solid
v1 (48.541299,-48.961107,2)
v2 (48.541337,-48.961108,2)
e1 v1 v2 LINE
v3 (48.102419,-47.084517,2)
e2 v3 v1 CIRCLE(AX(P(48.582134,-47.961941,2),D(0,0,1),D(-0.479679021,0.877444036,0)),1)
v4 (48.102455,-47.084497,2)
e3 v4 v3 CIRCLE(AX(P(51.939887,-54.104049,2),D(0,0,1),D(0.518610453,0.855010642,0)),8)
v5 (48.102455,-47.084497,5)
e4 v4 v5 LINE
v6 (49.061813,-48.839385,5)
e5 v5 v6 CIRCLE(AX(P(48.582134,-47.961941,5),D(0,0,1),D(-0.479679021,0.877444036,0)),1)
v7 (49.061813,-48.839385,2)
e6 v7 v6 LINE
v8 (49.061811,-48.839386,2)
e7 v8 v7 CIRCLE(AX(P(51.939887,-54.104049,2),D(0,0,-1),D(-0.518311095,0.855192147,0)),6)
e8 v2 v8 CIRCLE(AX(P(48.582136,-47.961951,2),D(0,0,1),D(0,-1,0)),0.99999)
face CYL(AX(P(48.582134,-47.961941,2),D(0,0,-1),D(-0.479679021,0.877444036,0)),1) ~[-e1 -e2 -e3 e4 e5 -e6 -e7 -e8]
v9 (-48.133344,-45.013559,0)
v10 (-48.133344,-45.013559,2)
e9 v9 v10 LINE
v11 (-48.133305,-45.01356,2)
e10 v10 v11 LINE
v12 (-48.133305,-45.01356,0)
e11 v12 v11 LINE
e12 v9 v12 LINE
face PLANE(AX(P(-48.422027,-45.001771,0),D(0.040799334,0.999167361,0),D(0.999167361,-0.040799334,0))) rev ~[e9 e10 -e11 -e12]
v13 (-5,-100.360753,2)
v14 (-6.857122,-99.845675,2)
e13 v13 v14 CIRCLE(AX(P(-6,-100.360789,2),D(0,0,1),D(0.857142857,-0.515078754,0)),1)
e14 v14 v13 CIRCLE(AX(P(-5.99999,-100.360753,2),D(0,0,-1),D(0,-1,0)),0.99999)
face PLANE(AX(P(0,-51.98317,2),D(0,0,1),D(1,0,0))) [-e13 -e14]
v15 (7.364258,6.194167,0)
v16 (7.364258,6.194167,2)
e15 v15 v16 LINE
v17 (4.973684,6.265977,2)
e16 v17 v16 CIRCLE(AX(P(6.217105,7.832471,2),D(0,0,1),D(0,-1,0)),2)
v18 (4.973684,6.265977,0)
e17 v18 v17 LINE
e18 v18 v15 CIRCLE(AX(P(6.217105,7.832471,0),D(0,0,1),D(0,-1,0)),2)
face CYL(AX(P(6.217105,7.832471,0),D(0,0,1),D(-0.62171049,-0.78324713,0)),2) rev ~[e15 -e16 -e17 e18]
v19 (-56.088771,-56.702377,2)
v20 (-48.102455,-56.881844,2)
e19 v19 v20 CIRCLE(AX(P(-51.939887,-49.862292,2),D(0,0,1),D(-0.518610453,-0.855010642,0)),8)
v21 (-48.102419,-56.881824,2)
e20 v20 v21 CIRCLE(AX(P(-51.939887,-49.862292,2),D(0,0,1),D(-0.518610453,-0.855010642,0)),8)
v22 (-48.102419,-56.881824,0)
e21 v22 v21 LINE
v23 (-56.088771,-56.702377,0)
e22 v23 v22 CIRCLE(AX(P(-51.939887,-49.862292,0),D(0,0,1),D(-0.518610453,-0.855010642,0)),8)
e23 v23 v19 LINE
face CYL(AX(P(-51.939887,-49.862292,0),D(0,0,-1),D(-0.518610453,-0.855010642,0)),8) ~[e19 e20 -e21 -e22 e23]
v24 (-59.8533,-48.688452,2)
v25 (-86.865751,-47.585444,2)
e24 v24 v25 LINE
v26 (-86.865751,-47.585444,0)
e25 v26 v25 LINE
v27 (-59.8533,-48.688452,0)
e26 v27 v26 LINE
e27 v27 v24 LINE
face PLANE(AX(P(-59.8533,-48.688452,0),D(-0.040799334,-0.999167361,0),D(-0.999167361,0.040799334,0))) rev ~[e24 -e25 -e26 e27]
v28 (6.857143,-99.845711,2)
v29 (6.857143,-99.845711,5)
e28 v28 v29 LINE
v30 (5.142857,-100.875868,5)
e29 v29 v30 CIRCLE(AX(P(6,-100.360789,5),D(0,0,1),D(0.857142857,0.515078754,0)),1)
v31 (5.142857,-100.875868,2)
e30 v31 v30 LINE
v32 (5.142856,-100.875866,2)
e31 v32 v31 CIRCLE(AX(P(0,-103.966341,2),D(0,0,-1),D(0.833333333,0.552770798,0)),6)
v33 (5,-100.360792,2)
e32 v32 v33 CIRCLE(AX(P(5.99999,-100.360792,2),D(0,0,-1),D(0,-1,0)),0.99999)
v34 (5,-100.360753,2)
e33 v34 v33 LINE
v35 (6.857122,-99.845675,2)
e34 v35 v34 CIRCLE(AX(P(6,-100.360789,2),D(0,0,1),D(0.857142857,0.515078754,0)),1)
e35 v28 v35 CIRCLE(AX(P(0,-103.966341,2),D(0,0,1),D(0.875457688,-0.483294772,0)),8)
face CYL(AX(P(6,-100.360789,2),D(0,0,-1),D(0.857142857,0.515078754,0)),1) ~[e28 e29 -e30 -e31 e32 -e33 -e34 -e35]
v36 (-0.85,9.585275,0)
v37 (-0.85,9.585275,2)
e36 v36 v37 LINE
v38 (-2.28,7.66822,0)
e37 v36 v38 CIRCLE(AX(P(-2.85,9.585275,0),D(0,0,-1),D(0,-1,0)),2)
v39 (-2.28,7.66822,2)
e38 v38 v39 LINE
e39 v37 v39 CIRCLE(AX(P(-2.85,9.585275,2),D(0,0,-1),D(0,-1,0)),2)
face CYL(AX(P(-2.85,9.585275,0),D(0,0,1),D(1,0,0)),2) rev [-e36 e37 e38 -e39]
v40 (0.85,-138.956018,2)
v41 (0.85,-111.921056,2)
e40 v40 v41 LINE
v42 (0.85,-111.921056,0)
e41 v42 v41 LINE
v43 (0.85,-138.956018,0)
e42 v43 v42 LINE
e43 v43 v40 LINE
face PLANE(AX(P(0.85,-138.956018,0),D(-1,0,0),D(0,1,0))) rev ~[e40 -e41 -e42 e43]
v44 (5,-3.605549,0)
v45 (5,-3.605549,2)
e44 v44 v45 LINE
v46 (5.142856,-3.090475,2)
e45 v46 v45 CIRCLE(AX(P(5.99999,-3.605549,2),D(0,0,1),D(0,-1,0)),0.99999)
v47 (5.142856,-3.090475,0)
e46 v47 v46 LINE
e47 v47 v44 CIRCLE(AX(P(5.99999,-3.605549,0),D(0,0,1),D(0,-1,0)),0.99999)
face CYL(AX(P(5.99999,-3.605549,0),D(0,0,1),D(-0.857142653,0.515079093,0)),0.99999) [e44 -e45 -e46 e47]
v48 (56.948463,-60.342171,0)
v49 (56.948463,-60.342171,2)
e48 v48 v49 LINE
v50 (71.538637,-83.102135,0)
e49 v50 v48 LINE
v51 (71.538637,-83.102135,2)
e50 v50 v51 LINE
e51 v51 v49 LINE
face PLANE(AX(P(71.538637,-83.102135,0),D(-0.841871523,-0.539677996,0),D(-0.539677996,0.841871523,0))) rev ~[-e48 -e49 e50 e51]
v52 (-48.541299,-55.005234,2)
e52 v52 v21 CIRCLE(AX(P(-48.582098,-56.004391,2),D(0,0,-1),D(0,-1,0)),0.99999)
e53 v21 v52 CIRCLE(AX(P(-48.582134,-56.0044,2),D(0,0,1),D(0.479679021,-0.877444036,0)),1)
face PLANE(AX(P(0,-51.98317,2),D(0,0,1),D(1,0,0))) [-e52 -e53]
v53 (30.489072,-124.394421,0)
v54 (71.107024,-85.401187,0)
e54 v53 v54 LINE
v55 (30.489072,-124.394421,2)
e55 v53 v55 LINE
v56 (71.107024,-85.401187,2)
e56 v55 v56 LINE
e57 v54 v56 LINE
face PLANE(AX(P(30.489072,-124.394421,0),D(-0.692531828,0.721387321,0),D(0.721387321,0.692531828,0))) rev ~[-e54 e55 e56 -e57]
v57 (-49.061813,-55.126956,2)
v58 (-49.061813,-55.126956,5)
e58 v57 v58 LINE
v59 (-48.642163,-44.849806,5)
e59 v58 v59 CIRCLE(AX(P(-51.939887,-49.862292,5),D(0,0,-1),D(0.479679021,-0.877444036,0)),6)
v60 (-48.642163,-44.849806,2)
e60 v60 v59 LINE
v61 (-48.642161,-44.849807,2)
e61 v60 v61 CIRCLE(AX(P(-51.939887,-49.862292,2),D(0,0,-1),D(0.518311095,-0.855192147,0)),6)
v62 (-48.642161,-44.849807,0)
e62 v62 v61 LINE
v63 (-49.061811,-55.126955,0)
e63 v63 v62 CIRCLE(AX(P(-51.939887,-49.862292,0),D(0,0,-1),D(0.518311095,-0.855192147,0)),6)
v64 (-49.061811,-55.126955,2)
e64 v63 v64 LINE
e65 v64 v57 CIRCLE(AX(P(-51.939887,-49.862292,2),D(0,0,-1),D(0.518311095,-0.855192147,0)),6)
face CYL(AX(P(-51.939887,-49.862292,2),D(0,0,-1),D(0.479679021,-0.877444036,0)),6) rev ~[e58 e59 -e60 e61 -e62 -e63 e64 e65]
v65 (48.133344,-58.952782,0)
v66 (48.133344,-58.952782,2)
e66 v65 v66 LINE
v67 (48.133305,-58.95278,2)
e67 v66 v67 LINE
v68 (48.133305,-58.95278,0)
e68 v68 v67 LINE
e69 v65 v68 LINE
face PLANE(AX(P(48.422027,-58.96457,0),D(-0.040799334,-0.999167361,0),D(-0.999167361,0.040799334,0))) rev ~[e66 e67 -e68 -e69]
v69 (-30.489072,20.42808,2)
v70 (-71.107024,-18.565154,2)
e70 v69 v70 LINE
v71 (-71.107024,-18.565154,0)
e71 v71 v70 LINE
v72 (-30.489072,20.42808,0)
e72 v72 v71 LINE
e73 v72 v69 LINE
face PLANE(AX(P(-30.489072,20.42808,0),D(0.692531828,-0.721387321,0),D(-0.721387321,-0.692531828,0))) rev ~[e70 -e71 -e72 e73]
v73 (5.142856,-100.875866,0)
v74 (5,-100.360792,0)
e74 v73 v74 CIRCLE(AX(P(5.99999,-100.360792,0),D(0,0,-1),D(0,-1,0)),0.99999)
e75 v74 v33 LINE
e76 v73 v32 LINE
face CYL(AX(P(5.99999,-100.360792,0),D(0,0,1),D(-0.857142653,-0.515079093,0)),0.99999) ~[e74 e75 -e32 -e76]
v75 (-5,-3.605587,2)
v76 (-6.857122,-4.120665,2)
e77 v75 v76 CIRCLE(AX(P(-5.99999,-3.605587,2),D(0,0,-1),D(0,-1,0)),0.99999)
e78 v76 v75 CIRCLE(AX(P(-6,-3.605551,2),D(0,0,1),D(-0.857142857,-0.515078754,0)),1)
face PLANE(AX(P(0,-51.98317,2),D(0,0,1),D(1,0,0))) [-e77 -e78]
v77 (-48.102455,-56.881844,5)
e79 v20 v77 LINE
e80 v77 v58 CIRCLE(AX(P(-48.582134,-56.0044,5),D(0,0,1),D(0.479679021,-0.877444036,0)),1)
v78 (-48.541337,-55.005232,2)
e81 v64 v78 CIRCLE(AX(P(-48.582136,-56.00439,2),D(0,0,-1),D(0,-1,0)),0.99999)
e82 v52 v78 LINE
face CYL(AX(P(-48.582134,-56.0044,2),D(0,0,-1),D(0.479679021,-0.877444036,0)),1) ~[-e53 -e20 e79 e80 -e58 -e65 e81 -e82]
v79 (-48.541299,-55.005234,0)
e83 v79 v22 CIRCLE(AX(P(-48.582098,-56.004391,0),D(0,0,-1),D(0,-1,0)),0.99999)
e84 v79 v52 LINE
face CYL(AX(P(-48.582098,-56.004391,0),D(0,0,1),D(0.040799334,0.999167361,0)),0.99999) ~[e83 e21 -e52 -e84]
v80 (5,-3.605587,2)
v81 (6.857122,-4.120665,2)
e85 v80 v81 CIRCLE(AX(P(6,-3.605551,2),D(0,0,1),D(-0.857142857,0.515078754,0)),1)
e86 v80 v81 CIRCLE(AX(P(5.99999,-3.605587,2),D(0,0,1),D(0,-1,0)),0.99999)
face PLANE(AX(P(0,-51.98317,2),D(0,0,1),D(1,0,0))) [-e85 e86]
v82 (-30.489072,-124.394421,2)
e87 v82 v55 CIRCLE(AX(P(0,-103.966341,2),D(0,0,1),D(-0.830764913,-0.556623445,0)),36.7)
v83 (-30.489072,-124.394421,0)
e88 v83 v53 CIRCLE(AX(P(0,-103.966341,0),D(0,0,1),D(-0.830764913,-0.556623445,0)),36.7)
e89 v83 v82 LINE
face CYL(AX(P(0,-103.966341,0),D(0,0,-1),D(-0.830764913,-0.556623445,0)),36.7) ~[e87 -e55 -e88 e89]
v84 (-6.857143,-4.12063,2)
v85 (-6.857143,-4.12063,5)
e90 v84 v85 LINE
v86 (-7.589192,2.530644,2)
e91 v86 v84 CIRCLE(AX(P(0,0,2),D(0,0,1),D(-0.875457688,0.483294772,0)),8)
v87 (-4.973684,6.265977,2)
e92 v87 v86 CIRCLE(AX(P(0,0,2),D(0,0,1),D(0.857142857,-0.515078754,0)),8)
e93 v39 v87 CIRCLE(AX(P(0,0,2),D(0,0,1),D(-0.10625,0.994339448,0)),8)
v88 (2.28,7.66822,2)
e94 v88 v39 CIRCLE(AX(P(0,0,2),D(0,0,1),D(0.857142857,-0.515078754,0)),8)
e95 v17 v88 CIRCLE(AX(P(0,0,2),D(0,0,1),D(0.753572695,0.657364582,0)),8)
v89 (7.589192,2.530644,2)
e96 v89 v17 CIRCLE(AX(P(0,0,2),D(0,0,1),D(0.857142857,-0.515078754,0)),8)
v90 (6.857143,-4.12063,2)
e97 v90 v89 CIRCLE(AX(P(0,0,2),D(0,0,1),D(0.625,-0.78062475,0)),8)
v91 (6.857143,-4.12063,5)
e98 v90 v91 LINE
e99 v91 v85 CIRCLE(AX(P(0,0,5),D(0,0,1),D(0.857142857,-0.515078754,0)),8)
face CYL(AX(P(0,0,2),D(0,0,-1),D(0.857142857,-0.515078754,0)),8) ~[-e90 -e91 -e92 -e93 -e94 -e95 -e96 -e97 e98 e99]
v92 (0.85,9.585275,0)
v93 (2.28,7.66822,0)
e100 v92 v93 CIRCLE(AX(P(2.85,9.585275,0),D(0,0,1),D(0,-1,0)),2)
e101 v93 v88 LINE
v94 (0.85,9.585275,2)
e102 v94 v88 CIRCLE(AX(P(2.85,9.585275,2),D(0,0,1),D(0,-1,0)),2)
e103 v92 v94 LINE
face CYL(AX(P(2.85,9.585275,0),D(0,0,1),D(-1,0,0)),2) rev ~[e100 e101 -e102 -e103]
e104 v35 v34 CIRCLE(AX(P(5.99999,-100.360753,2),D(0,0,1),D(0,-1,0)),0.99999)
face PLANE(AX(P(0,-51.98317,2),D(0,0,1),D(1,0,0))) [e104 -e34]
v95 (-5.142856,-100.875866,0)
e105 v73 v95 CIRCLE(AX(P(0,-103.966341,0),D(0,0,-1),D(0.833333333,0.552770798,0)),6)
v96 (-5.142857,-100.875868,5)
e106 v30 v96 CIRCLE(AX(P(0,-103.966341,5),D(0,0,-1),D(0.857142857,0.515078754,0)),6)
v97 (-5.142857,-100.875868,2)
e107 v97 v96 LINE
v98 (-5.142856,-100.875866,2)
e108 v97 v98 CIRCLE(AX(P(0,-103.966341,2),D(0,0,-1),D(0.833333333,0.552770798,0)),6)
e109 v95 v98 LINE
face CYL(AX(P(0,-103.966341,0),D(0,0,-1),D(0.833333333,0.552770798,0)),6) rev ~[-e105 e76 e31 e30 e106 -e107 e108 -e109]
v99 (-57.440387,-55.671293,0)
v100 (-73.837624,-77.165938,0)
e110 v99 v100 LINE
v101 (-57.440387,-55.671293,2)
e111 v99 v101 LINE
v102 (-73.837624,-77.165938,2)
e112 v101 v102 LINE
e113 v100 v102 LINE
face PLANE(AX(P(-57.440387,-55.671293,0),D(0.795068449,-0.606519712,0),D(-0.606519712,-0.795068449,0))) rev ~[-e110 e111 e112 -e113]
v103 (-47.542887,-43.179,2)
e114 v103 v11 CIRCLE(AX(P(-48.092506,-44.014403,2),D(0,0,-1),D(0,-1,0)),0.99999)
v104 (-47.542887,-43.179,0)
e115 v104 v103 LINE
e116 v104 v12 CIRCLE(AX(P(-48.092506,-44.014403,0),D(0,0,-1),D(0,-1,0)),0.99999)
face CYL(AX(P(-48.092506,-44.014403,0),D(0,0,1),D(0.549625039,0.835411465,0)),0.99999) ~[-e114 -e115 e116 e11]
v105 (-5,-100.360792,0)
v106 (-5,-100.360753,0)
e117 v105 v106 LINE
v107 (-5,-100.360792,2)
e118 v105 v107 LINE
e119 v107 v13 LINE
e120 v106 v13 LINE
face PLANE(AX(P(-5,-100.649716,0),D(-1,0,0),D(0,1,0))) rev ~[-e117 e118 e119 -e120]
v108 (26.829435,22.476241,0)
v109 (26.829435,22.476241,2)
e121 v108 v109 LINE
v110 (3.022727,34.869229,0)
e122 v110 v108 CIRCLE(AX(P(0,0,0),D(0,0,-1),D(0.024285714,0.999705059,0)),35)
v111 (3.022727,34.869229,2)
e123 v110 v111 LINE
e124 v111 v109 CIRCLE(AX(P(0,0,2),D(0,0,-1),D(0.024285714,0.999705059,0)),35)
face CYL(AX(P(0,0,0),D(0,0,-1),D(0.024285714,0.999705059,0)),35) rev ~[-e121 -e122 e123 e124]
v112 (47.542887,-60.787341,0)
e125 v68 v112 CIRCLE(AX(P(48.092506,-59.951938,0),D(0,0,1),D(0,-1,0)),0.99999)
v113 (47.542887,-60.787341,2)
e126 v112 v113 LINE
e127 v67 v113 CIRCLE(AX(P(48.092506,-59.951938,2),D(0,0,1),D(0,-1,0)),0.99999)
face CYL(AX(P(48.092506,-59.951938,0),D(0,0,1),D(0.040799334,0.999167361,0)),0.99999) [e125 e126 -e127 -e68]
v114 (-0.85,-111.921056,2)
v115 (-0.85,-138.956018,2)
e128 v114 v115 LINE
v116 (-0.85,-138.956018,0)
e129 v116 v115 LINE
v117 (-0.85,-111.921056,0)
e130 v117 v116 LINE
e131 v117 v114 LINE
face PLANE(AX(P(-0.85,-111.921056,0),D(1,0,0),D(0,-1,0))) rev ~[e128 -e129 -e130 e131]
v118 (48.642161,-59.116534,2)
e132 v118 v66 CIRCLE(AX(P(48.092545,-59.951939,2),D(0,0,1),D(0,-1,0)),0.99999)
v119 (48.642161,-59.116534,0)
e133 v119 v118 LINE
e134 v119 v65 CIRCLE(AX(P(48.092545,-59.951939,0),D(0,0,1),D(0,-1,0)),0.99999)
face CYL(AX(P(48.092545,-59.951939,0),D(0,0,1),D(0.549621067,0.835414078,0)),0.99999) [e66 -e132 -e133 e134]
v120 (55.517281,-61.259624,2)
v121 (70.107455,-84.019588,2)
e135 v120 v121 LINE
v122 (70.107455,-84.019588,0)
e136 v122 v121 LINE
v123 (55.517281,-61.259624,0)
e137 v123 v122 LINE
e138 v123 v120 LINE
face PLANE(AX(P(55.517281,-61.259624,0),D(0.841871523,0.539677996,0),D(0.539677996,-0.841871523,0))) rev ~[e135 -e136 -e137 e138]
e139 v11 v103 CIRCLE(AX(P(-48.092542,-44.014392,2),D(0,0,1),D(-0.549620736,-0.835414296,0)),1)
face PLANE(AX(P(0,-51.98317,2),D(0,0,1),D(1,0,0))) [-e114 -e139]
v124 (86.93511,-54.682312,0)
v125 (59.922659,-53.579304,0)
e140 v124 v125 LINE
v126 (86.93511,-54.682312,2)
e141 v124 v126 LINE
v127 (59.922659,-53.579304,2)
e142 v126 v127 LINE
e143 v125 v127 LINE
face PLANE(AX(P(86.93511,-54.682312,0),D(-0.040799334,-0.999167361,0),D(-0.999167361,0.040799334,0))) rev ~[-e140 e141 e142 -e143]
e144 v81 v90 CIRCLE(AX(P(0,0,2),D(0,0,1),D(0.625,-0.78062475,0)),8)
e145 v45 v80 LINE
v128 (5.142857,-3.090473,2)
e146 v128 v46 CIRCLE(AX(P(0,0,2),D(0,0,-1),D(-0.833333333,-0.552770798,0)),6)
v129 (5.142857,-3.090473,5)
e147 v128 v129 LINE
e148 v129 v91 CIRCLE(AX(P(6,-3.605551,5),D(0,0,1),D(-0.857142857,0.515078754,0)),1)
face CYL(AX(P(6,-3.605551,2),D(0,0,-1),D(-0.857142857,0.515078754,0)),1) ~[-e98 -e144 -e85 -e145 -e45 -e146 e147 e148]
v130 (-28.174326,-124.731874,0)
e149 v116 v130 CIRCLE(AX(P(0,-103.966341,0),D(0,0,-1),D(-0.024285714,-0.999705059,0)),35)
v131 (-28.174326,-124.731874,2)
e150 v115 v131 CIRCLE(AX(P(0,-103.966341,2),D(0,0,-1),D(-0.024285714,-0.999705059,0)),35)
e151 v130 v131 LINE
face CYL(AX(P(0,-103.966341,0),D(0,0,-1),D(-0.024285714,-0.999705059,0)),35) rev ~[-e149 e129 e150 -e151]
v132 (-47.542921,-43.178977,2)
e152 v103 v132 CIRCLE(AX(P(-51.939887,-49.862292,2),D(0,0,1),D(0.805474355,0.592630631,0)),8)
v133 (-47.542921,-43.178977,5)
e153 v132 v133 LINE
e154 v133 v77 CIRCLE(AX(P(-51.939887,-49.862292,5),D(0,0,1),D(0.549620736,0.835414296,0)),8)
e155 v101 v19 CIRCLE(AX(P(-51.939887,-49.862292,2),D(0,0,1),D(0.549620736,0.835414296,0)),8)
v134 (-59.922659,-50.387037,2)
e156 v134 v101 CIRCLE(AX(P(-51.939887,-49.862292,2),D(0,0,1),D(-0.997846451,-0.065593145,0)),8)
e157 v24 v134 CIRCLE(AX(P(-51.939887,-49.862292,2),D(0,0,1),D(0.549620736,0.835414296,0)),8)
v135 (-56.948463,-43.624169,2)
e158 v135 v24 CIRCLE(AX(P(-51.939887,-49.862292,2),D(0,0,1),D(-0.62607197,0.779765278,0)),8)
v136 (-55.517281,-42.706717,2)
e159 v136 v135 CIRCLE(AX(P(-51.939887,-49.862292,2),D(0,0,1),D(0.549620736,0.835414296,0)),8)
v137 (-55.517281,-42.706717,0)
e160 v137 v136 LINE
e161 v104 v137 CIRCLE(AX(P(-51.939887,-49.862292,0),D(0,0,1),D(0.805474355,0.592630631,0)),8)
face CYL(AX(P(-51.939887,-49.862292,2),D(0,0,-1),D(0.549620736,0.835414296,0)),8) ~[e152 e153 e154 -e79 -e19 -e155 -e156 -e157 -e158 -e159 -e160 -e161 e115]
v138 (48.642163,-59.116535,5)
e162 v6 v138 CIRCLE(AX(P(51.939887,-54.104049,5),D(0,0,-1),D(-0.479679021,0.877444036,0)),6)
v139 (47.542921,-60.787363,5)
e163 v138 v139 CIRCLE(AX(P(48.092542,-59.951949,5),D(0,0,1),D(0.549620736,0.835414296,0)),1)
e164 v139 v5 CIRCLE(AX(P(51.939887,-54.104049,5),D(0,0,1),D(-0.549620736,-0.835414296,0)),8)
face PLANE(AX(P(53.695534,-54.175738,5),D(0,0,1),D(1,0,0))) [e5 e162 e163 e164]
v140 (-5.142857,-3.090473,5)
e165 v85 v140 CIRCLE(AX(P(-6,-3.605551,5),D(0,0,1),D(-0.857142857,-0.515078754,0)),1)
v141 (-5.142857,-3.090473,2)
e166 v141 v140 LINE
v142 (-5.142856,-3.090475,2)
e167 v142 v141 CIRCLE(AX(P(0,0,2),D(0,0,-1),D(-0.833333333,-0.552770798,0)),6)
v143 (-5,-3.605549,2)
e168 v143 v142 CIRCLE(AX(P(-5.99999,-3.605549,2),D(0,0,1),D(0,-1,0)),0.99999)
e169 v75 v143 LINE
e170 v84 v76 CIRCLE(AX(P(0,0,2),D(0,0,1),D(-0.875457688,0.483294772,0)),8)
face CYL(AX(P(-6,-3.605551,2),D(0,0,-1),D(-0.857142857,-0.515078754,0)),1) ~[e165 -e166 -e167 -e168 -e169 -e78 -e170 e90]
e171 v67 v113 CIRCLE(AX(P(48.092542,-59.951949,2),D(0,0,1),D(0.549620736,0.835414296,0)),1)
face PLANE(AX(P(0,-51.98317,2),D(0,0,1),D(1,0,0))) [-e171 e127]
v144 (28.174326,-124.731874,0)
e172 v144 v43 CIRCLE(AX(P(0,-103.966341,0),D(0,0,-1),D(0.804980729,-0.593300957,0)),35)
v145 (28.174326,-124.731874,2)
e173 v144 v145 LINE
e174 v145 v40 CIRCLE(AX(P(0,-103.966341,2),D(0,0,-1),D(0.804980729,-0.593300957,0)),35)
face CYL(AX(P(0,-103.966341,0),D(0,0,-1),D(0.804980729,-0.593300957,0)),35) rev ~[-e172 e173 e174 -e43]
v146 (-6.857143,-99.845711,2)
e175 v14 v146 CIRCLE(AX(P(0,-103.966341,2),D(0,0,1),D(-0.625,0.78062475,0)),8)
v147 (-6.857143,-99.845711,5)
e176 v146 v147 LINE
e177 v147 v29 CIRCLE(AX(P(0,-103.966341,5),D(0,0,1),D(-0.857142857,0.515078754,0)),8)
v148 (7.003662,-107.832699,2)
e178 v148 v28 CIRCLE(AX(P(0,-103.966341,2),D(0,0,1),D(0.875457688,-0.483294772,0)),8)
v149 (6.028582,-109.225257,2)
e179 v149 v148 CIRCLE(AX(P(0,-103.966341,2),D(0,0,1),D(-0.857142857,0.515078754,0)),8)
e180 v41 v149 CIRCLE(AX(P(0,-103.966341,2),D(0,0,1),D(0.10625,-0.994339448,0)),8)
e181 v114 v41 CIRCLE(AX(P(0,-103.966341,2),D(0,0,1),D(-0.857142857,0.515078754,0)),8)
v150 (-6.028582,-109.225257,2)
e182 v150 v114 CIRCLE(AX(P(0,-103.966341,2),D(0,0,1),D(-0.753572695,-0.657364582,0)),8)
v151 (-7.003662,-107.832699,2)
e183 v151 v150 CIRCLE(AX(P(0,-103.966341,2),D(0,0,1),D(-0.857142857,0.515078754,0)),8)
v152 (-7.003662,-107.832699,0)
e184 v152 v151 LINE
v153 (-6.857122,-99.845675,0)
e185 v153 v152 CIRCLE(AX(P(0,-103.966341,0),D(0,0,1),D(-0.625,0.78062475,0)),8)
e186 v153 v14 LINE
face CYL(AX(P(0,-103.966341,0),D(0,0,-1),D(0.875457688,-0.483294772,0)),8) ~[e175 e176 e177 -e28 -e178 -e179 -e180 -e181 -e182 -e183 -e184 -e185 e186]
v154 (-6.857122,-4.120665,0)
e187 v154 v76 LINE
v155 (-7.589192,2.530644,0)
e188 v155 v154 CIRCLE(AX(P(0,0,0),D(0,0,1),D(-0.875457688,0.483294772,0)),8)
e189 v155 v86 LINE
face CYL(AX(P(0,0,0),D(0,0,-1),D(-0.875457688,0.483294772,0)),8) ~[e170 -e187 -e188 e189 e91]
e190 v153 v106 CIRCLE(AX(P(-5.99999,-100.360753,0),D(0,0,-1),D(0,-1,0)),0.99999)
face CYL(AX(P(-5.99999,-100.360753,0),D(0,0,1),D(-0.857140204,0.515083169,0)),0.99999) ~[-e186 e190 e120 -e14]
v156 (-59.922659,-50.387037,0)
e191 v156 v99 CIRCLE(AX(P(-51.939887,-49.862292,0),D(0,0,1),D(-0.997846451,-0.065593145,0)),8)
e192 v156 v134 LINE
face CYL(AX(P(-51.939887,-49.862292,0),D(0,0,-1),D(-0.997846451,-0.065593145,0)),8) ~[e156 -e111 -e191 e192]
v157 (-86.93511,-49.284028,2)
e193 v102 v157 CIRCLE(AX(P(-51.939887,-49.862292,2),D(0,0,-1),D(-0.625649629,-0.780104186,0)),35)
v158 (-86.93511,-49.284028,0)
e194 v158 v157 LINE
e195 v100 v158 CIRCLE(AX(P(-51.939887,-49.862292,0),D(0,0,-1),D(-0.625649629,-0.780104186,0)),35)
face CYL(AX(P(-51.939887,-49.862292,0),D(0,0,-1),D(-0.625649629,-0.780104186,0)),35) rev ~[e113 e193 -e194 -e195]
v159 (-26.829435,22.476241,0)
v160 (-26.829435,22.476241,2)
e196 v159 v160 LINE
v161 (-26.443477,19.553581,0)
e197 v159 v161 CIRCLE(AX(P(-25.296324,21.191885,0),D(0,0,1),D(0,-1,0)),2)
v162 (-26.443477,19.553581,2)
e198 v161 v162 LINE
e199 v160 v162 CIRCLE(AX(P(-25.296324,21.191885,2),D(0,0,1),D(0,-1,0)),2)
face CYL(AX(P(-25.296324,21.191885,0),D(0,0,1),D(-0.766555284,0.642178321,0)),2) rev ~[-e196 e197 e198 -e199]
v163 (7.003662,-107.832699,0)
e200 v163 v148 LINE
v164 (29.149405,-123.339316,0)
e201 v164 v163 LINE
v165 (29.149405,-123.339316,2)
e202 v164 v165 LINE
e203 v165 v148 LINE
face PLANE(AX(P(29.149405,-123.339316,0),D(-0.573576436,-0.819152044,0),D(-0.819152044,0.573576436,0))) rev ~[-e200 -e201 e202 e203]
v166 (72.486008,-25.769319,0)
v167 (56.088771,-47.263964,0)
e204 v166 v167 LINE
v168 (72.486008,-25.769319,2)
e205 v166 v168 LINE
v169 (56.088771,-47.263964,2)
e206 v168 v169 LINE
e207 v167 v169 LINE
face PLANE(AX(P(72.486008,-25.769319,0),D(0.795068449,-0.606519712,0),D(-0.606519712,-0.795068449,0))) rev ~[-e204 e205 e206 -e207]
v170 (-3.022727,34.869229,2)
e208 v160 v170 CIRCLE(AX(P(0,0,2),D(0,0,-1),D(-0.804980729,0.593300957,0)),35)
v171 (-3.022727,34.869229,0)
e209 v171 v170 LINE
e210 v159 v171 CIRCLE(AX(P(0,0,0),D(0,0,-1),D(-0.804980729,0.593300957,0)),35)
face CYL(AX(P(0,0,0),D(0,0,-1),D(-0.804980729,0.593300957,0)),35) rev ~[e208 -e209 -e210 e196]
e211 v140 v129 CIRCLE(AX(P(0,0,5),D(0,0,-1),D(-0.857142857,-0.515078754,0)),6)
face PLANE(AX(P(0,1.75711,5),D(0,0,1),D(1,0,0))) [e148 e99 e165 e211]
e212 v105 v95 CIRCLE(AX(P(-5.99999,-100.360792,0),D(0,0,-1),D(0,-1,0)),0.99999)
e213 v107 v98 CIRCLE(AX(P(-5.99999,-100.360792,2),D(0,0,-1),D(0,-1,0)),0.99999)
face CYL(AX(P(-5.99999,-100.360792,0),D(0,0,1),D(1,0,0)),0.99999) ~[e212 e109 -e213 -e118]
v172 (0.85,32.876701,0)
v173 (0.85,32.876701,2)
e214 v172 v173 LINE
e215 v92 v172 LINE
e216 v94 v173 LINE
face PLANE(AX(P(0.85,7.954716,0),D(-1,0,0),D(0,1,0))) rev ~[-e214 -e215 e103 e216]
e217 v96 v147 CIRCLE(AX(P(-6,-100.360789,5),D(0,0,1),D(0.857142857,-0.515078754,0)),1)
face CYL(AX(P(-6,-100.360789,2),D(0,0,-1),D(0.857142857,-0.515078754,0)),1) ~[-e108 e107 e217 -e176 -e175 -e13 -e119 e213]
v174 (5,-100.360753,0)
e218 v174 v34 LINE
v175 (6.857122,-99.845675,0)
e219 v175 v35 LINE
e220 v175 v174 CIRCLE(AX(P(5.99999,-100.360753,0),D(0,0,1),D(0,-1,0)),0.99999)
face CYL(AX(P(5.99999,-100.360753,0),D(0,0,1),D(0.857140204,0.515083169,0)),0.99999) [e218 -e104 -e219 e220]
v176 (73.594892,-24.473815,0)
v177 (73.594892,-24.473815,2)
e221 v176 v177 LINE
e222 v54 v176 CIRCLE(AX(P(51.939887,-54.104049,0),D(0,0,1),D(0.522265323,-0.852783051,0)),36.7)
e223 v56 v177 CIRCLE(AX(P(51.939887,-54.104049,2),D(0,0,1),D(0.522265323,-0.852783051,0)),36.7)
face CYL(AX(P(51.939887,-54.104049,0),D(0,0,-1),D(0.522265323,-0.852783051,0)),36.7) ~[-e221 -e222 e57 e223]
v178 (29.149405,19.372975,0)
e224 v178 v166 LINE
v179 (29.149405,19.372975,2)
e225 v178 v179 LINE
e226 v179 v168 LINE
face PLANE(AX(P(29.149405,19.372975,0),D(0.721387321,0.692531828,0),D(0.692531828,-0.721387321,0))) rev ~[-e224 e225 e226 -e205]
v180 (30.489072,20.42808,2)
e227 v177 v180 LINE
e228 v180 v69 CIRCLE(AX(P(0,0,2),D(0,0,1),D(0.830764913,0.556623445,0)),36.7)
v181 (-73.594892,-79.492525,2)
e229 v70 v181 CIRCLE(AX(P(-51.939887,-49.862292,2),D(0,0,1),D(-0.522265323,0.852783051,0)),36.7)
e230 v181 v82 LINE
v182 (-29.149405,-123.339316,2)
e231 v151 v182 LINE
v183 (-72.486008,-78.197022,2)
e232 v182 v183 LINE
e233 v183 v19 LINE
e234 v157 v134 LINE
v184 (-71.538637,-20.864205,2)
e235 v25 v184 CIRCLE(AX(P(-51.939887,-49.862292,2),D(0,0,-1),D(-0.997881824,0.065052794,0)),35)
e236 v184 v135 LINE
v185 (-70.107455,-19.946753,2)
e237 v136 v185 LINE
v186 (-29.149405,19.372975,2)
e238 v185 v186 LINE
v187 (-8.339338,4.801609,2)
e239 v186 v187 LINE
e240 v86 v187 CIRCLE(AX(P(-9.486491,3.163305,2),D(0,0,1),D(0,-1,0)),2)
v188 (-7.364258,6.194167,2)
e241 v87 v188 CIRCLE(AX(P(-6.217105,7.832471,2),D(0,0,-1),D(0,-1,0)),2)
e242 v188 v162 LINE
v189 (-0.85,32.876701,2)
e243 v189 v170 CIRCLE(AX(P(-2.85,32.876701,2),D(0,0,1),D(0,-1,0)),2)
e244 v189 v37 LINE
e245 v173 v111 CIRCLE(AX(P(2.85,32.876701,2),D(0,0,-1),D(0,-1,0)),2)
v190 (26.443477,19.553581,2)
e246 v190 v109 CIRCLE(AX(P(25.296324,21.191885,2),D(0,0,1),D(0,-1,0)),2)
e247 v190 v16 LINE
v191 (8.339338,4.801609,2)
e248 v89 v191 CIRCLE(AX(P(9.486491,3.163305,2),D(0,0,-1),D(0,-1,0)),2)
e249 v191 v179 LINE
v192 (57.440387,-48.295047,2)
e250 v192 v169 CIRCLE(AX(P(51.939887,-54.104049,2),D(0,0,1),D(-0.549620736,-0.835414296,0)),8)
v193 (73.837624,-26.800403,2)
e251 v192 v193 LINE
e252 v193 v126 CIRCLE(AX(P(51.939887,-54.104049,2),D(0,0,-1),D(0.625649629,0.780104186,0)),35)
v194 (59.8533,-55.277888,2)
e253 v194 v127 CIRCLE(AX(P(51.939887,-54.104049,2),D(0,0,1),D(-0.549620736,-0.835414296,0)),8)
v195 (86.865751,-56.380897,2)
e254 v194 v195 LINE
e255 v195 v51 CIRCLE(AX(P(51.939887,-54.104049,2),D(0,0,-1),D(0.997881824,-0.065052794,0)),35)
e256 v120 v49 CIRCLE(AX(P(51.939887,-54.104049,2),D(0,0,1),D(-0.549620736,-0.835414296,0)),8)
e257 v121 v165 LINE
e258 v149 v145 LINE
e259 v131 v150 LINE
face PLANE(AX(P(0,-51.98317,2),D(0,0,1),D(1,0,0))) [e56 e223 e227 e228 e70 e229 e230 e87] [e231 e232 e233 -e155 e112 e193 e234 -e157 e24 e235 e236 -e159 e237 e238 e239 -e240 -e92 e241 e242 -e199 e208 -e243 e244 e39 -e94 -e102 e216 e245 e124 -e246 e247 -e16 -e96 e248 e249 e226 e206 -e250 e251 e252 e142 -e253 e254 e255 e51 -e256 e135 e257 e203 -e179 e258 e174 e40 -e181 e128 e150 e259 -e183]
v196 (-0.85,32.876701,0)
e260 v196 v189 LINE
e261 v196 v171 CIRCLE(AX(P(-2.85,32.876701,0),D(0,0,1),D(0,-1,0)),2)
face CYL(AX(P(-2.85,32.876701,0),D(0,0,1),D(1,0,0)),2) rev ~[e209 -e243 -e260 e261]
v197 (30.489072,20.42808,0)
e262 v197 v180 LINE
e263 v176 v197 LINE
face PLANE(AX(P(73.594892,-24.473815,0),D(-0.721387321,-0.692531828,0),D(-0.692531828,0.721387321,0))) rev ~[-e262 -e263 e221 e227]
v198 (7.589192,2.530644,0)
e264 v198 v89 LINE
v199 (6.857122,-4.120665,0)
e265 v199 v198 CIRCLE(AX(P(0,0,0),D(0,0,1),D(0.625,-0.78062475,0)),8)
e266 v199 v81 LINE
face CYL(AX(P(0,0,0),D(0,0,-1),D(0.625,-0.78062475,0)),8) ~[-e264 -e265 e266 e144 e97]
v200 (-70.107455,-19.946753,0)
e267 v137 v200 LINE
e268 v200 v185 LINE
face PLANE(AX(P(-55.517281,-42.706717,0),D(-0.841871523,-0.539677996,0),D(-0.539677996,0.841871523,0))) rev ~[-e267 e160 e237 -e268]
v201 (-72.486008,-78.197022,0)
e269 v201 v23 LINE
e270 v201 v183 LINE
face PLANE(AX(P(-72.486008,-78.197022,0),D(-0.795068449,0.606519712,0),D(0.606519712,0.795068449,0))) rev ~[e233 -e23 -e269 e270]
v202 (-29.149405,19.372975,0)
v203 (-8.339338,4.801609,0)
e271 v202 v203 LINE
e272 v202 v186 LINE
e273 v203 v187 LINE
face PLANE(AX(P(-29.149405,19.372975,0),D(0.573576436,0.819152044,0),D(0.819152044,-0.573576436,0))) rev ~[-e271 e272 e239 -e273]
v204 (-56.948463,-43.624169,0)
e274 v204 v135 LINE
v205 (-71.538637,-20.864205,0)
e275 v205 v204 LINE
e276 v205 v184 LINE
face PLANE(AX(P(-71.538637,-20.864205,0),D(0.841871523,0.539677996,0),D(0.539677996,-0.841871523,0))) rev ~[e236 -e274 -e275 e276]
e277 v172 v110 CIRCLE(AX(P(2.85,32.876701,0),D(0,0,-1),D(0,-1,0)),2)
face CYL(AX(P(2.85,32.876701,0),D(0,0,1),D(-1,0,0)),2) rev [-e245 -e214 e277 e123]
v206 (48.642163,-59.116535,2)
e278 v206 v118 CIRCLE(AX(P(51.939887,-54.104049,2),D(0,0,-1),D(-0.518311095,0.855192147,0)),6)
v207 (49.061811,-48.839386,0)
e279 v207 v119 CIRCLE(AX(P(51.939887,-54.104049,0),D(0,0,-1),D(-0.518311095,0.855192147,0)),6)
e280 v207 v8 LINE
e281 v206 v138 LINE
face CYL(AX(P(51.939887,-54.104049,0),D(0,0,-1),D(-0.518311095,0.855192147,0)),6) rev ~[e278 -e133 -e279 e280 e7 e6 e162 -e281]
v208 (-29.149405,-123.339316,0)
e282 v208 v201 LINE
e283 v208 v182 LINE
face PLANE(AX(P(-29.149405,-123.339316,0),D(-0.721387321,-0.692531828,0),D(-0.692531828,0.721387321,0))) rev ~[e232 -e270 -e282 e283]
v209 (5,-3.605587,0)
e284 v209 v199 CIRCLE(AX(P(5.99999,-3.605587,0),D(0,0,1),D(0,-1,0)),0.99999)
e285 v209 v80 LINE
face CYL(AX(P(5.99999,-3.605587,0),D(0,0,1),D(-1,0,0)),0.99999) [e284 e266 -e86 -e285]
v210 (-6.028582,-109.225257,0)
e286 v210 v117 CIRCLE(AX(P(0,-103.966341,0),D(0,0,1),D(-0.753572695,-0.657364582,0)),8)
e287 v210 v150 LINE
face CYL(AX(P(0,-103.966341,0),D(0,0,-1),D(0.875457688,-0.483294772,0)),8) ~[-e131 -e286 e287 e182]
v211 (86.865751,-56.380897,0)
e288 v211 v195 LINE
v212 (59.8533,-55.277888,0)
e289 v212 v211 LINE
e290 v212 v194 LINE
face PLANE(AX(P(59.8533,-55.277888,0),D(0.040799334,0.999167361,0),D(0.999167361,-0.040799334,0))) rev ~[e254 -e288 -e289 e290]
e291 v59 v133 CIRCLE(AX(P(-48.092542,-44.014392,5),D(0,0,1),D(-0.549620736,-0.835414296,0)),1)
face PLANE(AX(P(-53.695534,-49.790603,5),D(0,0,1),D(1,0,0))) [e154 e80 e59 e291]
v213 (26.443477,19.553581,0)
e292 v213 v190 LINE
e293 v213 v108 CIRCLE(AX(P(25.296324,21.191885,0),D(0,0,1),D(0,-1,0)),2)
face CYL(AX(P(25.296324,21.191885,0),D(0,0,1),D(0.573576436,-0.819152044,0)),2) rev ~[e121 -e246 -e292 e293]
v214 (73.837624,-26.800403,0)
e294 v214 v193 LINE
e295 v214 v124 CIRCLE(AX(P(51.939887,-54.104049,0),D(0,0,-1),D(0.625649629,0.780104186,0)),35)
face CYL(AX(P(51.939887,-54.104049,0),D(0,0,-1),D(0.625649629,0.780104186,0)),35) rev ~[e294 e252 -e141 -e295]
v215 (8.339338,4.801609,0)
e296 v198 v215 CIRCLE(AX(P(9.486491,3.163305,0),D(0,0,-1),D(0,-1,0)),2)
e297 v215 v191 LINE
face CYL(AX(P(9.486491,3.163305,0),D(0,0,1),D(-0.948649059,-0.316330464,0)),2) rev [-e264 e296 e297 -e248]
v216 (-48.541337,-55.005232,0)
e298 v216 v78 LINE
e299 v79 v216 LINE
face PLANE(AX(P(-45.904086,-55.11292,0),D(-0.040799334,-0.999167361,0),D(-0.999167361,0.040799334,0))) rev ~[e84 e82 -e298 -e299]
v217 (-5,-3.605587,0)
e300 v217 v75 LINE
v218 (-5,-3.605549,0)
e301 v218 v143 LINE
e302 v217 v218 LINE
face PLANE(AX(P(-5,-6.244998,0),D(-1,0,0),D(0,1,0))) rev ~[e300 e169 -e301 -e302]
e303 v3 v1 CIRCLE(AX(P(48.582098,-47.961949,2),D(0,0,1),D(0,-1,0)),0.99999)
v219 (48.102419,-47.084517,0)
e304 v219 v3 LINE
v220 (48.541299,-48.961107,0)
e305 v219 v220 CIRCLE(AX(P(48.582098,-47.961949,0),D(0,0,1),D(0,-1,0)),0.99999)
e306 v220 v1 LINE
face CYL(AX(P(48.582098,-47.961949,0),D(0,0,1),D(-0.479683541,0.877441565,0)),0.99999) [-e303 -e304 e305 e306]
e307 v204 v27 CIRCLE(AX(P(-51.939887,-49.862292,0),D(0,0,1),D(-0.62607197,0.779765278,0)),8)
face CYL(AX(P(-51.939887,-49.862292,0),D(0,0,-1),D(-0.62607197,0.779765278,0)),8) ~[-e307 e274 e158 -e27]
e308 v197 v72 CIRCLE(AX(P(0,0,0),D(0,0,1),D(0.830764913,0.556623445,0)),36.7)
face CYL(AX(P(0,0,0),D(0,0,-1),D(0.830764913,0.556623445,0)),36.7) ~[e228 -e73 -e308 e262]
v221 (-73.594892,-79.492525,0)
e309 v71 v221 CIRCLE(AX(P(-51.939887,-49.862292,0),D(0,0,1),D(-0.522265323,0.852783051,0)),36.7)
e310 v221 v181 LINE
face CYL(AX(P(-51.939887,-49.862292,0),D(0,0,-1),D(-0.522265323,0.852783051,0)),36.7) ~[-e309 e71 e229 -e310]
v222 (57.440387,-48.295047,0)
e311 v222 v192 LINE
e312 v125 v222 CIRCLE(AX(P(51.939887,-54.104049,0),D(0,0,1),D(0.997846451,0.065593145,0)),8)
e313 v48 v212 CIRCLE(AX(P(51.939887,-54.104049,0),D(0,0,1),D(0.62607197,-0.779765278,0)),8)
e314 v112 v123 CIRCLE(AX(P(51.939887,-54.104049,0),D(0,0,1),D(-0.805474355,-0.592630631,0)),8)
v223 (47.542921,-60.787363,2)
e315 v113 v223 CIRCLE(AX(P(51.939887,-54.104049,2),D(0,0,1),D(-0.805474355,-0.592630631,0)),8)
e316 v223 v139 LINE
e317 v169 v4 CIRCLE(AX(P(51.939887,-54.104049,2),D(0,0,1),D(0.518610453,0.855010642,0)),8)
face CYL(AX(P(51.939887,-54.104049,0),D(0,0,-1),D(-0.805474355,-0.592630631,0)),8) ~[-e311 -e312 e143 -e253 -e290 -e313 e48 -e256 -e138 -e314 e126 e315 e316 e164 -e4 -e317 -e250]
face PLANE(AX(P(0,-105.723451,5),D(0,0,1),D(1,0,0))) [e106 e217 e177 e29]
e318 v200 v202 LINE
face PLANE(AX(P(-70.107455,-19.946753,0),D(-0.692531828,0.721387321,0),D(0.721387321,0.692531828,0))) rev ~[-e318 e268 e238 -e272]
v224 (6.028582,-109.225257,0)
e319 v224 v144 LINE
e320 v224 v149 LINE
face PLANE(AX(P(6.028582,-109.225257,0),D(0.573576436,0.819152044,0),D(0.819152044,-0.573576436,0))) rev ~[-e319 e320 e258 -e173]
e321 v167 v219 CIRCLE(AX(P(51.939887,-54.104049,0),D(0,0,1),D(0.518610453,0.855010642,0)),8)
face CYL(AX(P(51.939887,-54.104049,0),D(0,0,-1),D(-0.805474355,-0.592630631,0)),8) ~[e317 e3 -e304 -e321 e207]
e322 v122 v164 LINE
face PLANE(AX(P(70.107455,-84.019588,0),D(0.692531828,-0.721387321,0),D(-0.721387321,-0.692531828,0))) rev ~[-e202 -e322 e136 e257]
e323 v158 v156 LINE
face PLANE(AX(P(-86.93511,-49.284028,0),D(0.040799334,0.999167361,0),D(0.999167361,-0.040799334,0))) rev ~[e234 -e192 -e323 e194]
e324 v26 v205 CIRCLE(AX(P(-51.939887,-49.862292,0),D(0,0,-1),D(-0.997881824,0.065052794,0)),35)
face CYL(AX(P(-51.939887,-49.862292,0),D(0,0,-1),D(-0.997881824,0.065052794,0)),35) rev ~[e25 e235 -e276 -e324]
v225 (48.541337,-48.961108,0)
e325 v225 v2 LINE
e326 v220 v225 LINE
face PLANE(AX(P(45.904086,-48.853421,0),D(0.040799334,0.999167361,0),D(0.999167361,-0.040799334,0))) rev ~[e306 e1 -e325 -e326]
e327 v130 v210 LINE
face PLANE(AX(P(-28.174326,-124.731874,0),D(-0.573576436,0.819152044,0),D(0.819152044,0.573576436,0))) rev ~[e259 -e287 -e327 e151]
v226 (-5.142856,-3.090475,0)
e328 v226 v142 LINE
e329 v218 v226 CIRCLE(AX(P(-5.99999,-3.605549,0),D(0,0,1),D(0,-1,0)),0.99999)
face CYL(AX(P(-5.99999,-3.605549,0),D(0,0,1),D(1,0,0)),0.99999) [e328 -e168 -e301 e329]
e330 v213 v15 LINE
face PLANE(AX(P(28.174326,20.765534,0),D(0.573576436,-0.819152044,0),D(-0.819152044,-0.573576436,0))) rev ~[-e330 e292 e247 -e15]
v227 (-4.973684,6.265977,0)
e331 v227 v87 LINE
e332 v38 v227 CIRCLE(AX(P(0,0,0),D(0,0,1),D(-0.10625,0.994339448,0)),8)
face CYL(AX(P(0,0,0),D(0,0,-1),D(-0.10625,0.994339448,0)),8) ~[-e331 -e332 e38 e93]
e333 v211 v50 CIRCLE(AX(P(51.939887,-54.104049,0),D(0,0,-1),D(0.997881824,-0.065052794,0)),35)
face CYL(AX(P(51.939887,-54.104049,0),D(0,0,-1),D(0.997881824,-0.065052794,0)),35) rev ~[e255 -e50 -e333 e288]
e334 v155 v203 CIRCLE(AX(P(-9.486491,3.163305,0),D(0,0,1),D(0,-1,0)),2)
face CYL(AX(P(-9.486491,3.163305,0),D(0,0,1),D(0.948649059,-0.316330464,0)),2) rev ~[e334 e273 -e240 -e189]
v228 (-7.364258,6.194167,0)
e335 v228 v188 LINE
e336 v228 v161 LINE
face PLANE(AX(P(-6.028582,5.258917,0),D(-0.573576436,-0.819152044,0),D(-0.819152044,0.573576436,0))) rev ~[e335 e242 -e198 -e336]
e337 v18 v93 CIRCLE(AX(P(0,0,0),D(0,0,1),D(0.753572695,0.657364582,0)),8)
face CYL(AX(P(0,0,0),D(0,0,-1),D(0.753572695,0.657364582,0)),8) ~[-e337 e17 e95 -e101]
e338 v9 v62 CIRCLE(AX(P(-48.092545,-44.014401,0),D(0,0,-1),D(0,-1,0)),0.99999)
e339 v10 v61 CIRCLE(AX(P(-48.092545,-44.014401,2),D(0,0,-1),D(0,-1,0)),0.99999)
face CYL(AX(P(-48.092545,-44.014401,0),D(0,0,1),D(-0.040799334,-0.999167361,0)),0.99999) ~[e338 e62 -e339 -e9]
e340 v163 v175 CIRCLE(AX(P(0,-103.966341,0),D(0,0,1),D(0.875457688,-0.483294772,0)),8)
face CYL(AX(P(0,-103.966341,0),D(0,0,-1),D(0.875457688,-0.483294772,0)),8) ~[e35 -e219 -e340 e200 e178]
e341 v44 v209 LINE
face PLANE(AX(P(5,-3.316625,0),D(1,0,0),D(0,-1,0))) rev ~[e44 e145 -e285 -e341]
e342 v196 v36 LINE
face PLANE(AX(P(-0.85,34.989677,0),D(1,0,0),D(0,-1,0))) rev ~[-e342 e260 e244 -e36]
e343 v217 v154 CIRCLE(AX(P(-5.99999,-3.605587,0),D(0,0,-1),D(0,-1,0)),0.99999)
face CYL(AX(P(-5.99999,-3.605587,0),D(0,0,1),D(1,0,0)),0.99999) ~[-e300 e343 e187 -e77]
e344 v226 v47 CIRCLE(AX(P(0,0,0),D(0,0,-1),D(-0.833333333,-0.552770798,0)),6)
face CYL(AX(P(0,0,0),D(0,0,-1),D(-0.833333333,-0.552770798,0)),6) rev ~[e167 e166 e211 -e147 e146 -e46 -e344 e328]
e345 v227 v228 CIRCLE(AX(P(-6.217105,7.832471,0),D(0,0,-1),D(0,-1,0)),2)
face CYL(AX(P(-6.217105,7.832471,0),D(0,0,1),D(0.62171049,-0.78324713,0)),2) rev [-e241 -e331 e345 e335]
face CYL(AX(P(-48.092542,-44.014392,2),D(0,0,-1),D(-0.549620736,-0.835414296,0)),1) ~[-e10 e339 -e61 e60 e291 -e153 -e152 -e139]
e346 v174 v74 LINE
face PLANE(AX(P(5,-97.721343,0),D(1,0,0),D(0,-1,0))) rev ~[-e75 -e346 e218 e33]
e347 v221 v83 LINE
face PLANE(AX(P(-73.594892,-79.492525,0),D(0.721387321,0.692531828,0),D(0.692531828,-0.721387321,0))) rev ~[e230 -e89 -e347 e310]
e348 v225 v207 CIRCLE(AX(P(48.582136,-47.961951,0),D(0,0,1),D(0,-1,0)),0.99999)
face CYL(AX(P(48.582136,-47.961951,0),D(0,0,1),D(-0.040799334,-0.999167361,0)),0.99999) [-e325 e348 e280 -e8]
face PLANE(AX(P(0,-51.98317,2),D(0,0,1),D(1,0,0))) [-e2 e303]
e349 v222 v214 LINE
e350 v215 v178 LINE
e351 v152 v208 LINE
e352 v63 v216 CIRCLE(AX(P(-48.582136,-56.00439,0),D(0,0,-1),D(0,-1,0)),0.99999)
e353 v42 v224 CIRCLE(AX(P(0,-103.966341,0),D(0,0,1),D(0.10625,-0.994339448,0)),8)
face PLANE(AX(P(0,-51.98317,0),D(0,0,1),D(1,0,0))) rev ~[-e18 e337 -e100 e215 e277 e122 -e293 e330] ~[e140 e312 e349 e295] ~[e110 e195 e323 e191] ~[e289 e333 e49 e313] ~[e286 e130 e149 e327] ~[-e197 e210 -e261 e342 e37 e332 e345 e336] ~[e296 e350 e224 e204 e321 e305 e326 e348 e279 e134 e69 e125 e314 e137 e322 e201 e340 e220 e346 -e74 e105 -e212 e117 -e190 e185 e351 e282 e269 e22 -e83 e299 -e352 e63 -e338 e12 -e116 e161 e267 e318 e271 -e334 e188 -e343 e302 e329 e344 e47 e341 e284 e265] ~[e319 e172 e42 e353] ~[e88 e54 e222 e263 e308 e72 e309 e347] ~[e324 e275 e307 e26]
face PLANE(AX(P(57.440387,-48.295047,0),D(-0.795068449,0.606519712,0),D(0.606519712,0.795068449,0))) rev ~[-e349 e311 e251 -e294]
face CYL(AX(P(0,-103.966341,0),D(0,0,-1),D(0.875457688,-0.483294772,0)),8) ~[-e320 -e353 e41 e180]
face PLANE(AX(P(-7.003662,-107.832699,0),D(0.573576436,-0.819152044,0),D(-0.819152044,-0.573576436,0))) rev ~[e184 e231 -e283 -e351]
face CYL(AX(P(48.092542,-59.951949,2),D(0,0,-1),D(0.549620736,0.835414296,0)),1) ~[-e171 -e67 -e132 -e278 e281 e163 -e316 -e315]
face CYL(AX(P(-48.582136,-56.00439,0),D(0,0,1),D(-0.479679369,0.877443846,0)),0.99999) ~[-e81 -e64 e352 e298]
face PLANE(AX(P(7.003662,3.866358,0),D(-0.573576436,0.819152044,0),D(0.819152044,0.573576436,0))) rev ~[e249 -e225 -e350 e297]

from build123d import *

# Parameters (mm, degrees)
F1_DEPTH = 2
F2_R     = 0.99999
F3_R     = 2
F6_DEPTH = 3


# Not quite as in the source:
# - a fillet or chamfer is up to 0.001 mm smaller than in the source, because OpenCascade refuses the exact size


with BuildPart() as f1:
    # F0 (on Top) → F1 (new body)
    with BuildSketch(Plane.XY):
        with BuildLine():
            Line((73.5948921635, -24.4738152558), (30.4890723007, 20.4280804346))
            ThreePointArc((30.4890723007, 20.4280804346), (0, 36.7), (-30.4890723007, 20.4280804346))
            Line((-30.4890723007, 20.4280804346), (-71.107024482, -18.5651536595))
            ThreePointArc((-71.107024482, -18.5651536595), (-88.6093292458, -48.364956076), (-73.5948921635, -79.4925254511))
            Line((-73.5948921635, -79.4925254511), (-30.4890723007, -124.3944211415))
            ThreePointArc((-30.4890723007, -124.3944211415), (0, -140.666340707), (30.4890723007, -124.3944211415))
            Line((30.4890723007, -124.3944211415), (71.107024482, -85.4011870475))
            ThreePointArc((71.107024482, -85.4011870475), (88.6093292458, -55.601384631), (73.5948921635, -24.4738152558))
        make_face()
        with BuildLine():
            Line((-28.1743255129, -124.7318742155), (-6.0285815603, -109.2252573607))
            ThreePointArc((-6.0285815603, -109.2252573607), (-3.6939889059, -111.0624273724), (-0.85, -111.9210562896))
            Line((-0.85, -111.9210562896), (-0.85, -138.9560177561))
            ThreePointArc((-0.85, -138.9560177561), (-16.1612014632, -135.0117198682), (-28.1743255129, -124.7318742155))
        make_face(mode=Mode.SUBTRACT)
        with BuildLine():
            ThreePointArc((-59.9226587205, -50.3870367891), (-59.1807775846, -53.2636891654), (-57.4403870983, -55.6712932586))
            Line((-57.4403870983, -55.6712932586), (-73.8376241337, -77.1659381522))
            ThreePointArc((-73.8376241337, -77.1659381522), (-83.618782922, -64.7434058486), (-86.9351098111, -49.2840283695))
            Line((-86.9351098111, -49.2840283695), (-59.9226587205, -50.3870367891))
        make_face(mode=Mode.SUBTRACT)
        with BuildLine():
            ThreePointArc((-5, -3.3166247904), (0, 6), (5, -3.3166247904))
            Line((5, -3.3166247904), (5, -6.2449979984))
            ThreePointArc((5, -6.2449979984), (7.847410611, -1.555039132), (7.0036615021, 3.8663581784))
            Line((7.0036615021, 3.8663581784), (29.1494054547, 19.3729750332))
            Line((29.1494054547, 19.3729750332), (72.4860077697, -25.7693190449))
            Line((72.4860077697, -25.7693190449), (56.0887707343, -47.2639639384))
            ThreePointArc((56.0887707343, -47.2639639384), (50.7063118949, -46.1997279693), (45.9040856171, -48.8534205162))
            Line((45.9040856171, -48.8534205162), (48.830020546, -48.9728961925))
            ThreePointArc((48.830020546, -48.9728961925), (57.9348912774, -54.3488450807), (48.4220272071, -58.9645697978))
            Line((48.4220272071, -58.9645697978), (45.4960922782, -58.8450941215))
            ThreePointArc((45.4960922782, -58.8450941215), (50.0659736435, -61.8814810638), (55.5172812862, -61.2596238927))
            Line((55.5172812862, -61.2596238927), (70.1074551181, -84.0195880634))
            Line((70.1074551181, -84.0195880634), (29.1494054547, -123.3393157402))
            Line((29.1494054547, -123.3393157402), (7.0036615021, -107.8326988854))
            ThreePointArc((7.0036615021, -107.8326988854), (7.847410611, -102.411301575), (5, -97.7213427086))
            Line((5, -97.7213427086), (5, -100.6497159166))
            ThreePointArc((5, -100.6497159166), (0, -109.966340707), (-5, -100.6497159166))
            Line((-5, -100.6497159166), (-5, -97.7213427086))
            ThreePointArc((-5, -97.7213427086), (-7.847410611, -102.411301575), (-7.0036615021, -107.8326988854))
            Line((-7.0036615021, -107.8326988854), (-29.1494054547, -123.3393157402))
            Line((-29.1494054547, -123.3393157402), (-72.4860077697, -78.1970216621))
            Line((-72.4860077697, -78.1970216621), (-56.0887707343, -56.7023767685))
            ThreePointArc((-56.0887707343, -56.7023767685), (-50.7063118949, -57.7666127376), (-45.9040856171, -55.1129201908))
            Line((-45.9040856171, -55.1129201908), (-48.830020546, -54.9934445145))
            ThreePointArc((-48.830020546, -54.9934445145), (-57.9348912774, -49.6174956263), (-48.4220272071, -45.0017709092))
            Line((-48.4220272071, -45.0017709092), (-45.4960922782, -45.1212465855))
            ThreePointArc((-45.4960922782, -45.1212465855), (-50.0659736435, -42.0848596432), (-55.5172812862, -42.7067168143))
            Line((-55.5172812862, -42.7067168143), (-70.1074551181, -19.9467526436))
            Line((-70.1074551181, -19.9467526436), (-29.1494054547, 19.3729750332))
            Line((-29.1494054547, 19.3729750332), (-7.0036615021, 3.8663581784))
            ThreePointArc((-7.0036615021, 3.8663581784), (-7.847410611, -1.555039132), (-5, -6.2449979984))
            Line((-5, -6.2449979984), (-5, -3.3166247904))
        make_face(mode=Mode.SUBTRACT)
        with BuildLine():
            Line((0.85, -138.9560177561), (0.85, -111.9210562896))
            ThreePointArc((0.85, -111.9210562896), (3.6939889059, -111.0624273724), (6.0285815603, -109.2252573607))
            Line((6.0285815603, -109.2252573607), (28.1743255129, -124.7318742155))
            ThreePointArc((28.1743255129, -124.7318742155), (16.1612014632, -135.0117198682), (0.85, -138.9560177561))
        make_face(mode=Mode.SUBTRACT)
        with BuildLine():
            ThreePointArc((56.9484628744, -60.3421712992), (58.8793530111, -58.0844778314), (59.8532998529, -55.2778884308))
            Line((59.8532998529, -55.2778884308), (86.8657509435, -56.3808968503))
            ThreePointArc((86.8657509435, -56.3808968503), (82.300050413, -71.5184248765), (71.5386367063, -83.1021354698))
            Line((71.5386367063, -83.1021354698), (56.9484628744, -60.3421712992))
        make_face(mode=Mode.SUBTRACT)
        with BuildLine():
            ThreePointArc((-56.9484628744, -43.6241694078), (-58.8793530111, -45.8818628756), (-59.8532998529, -48.6884522762))
            Line((-59.8532998529, -48.6884522762), (-86.8657509435, -47.5854438566))
            ThreePointArc((-86.8657509435, -47.5854438566), (-82.300050413, -32.4479158305), (-71.5386367063, -20.8642052372))
            Line((-71.5386367063, -20.8642052372), (-56.9484628744, -43.6241694078))
        make_face(mode=Mode.SUBTRACT)
        with BuildLine():
            ThreePointArc((-0.85, 7.9547155826), (-3.6939889059, 7.0960866654), (-6.0285815603, 5.2589166537))
            Line((-6.0285815603, 5.2589166537), (-28.1743255129, 20.7655335085))
            ThreePointArc((-28.1743255129, 20.7655335085), (-16.1612014632, 31.0453791612), (-0.85, 34.9896770491))
            Line((-0.85, 34.9896770491), (-0.85, 7.9547155826))
        make_face(mode=Mode.SUBTRACT)
        with BuildLine():
            ThreePointArc((59.9226587205, -53.5793039179), (59.1807775846, -50.7026515416), (57.4403870983, -48.2950474484))
            Line((57.4403870983, -48.2950474484), (73.8376241337, -26.8004025548))
            ThreePointArc((73.8376241337, -26.8004025548), (83.618782922, -39.2229348584), (86.9351098111, -54.6823123374))
            Line((86.9351098111, -54.6823123374), (59.9226587205, -53.5793039179))
        make_face(mode=Mode.SUBTRACT)
        with BuildLine():
            ThreePointArc((0.85, 34.9896770491), (16.1612014632, 31.0453791612), (28.1743255129, 20.7655335085))
            Line((28.1743255129, 20.7655335085), (6.0285815603, 5.2589166537))
            ThreePointArc((6.0285815603, 5.2589166537), (3.6939889059, 7.0960866654), (0.85, 7.9547155826))
            Line((0.85, 7.9547155826), (0.85, 34.9896770491))
        make_face(mode=Mode.SUBTRACT)
    extrude(amount=F1_DEPTH)

    # F2 (radius 1 in the source; OpenCascade refuses exactly that, so slightly less here)
    f2_edges = [f1.edges().sort_by_distance(p)[0] for p in [
        (-5, -3.316625, 1),
        (-5, -6.244998, 1),
        (5, -3.316625, 1),
        (5, -6.244998, 1),
        (48.830021, -48.972896, 1),
        (45.904086, -48.853421, 1),
        (48.422027, -58.96457, 1),
        (45.496092, -58.845094, 1),
        (5, -100.649716, 1),
        (5, -97.721343, 1),
        (-5, -97.721343, 1),
        (-5, -100.649716, 1),
        (-48.830021, -54.993445, 1),
        (-45.904086, -55.11292, 1),
        (-48.422027, -45.001771, 1),
        (-45.496092, -45.121247, 1),
    ]]
    fillet(f2_edges, radius=F2_R)

    # F3
    f3_edges = [f1.edges().sort_by_distance(p)[0] for p in [
        (6.028582, 5.258917, 1),
        (0.85, 7.954716, 1),
        (7.003662, 3.866358, 1),
        (-0.85, 7.954716, 1),
        (-7.003662, 3.866358, 1),
        (-6.028582, 5.258917, 1),
        (28.174326, 20.765534, 1),
        (-28.174326, 20.765534, 1),
        (-0.85, 34.989677, 1),
        (0.85, 34.989677, 1),
    ]]
    fillet(f3_edges, radius=F3_R)

    # F5 (on face) → F6 (join)
    with BuildSketch(Plane.XY.offset(2)):
        with BuildLine():
            ThreePointArc((-49.0618129875, -55.126955847), (-57.9348912774, -49.6174956263), (-48.6421626961, -44.8498058529))
            ThreePointArc((-48.6421626961, -44.8498058529), (-47.2571276636, -44.5640122932), (-47.5429212234, -43.1789772607))
            ThreePointArc((-47.5429212234, -43.1789772607), (-59.9332259985, -49.5358969586), (-48.1024549453, -56.8818439194))
            ThreePointArc((-48.1024549453, -56.8818439194), (-47.7046899302, -55.5247208621), (-49.0618129875, -55.126955847))
        make_face()
        with BuildLine():
            ThreePointArc((-6.8571428571, -99.8457106779), (0, -111.966340707), (6.8571428571, -99.8457106779))
            ThreePointArc((6.8571428571, -99.8457106779), (5.4849212464, -99.5036465744), (5.1428571429, -100.8758681852))
            ThreePointArc((5.1428571429, -100.8758681852), (0, -109.966340707), (-5.1428571429, -100.8758681852))
            ThreePointArc((-5.1428571429, -100.8758681852), (-5.4849212464, -99.5036465744), (-6.8571428571, -99.8457106779))
        make_face()
        with BuildLine():
            ThreePointArc((49.0618129875, -48.83938486), (57.9348912774, -54.3488450807), (48.6421626961, -59.1165348541))
            ThreePointArc((48.6421626961, -59.1165348541), (47.2571276636, -59.4023284138), (47.5429212234, -60.7873634463))
            ThreePointArc((47.5429212234, -60.7873634463), (59.9332259985, -54.4304437484), (48.1024549453, -47.0844967876))
            ThreePointArc((48.1024549453, -47.0844967876), (47.7046899302, -48.4416198449), (49.0618129875, -48.83938486))
        make_face()
        with BuildLine():
            ThreePointArc((-5.1428571429, -3.0904725218), (0, 6), (5.1428571429, -3.0904725218))
            ThreePointArc((5.1428571429, -3.0904725218), (5.4849212464, -4.4626941326), (6.8571428571, -4.1206300291))
            ThreePointArc((6.8571428571, -4.1206300291), (0, 8), (-6.8571428571, -4.1206300291))
            ThreePointArc((-6.8571428571, -4.1206300291), (-5.4849212464, -4.4626941326), (-5.1428571429, -3.0904725218))
        make_face()
    extrude(amount=F6_DEPTH)


solid = f1.part
